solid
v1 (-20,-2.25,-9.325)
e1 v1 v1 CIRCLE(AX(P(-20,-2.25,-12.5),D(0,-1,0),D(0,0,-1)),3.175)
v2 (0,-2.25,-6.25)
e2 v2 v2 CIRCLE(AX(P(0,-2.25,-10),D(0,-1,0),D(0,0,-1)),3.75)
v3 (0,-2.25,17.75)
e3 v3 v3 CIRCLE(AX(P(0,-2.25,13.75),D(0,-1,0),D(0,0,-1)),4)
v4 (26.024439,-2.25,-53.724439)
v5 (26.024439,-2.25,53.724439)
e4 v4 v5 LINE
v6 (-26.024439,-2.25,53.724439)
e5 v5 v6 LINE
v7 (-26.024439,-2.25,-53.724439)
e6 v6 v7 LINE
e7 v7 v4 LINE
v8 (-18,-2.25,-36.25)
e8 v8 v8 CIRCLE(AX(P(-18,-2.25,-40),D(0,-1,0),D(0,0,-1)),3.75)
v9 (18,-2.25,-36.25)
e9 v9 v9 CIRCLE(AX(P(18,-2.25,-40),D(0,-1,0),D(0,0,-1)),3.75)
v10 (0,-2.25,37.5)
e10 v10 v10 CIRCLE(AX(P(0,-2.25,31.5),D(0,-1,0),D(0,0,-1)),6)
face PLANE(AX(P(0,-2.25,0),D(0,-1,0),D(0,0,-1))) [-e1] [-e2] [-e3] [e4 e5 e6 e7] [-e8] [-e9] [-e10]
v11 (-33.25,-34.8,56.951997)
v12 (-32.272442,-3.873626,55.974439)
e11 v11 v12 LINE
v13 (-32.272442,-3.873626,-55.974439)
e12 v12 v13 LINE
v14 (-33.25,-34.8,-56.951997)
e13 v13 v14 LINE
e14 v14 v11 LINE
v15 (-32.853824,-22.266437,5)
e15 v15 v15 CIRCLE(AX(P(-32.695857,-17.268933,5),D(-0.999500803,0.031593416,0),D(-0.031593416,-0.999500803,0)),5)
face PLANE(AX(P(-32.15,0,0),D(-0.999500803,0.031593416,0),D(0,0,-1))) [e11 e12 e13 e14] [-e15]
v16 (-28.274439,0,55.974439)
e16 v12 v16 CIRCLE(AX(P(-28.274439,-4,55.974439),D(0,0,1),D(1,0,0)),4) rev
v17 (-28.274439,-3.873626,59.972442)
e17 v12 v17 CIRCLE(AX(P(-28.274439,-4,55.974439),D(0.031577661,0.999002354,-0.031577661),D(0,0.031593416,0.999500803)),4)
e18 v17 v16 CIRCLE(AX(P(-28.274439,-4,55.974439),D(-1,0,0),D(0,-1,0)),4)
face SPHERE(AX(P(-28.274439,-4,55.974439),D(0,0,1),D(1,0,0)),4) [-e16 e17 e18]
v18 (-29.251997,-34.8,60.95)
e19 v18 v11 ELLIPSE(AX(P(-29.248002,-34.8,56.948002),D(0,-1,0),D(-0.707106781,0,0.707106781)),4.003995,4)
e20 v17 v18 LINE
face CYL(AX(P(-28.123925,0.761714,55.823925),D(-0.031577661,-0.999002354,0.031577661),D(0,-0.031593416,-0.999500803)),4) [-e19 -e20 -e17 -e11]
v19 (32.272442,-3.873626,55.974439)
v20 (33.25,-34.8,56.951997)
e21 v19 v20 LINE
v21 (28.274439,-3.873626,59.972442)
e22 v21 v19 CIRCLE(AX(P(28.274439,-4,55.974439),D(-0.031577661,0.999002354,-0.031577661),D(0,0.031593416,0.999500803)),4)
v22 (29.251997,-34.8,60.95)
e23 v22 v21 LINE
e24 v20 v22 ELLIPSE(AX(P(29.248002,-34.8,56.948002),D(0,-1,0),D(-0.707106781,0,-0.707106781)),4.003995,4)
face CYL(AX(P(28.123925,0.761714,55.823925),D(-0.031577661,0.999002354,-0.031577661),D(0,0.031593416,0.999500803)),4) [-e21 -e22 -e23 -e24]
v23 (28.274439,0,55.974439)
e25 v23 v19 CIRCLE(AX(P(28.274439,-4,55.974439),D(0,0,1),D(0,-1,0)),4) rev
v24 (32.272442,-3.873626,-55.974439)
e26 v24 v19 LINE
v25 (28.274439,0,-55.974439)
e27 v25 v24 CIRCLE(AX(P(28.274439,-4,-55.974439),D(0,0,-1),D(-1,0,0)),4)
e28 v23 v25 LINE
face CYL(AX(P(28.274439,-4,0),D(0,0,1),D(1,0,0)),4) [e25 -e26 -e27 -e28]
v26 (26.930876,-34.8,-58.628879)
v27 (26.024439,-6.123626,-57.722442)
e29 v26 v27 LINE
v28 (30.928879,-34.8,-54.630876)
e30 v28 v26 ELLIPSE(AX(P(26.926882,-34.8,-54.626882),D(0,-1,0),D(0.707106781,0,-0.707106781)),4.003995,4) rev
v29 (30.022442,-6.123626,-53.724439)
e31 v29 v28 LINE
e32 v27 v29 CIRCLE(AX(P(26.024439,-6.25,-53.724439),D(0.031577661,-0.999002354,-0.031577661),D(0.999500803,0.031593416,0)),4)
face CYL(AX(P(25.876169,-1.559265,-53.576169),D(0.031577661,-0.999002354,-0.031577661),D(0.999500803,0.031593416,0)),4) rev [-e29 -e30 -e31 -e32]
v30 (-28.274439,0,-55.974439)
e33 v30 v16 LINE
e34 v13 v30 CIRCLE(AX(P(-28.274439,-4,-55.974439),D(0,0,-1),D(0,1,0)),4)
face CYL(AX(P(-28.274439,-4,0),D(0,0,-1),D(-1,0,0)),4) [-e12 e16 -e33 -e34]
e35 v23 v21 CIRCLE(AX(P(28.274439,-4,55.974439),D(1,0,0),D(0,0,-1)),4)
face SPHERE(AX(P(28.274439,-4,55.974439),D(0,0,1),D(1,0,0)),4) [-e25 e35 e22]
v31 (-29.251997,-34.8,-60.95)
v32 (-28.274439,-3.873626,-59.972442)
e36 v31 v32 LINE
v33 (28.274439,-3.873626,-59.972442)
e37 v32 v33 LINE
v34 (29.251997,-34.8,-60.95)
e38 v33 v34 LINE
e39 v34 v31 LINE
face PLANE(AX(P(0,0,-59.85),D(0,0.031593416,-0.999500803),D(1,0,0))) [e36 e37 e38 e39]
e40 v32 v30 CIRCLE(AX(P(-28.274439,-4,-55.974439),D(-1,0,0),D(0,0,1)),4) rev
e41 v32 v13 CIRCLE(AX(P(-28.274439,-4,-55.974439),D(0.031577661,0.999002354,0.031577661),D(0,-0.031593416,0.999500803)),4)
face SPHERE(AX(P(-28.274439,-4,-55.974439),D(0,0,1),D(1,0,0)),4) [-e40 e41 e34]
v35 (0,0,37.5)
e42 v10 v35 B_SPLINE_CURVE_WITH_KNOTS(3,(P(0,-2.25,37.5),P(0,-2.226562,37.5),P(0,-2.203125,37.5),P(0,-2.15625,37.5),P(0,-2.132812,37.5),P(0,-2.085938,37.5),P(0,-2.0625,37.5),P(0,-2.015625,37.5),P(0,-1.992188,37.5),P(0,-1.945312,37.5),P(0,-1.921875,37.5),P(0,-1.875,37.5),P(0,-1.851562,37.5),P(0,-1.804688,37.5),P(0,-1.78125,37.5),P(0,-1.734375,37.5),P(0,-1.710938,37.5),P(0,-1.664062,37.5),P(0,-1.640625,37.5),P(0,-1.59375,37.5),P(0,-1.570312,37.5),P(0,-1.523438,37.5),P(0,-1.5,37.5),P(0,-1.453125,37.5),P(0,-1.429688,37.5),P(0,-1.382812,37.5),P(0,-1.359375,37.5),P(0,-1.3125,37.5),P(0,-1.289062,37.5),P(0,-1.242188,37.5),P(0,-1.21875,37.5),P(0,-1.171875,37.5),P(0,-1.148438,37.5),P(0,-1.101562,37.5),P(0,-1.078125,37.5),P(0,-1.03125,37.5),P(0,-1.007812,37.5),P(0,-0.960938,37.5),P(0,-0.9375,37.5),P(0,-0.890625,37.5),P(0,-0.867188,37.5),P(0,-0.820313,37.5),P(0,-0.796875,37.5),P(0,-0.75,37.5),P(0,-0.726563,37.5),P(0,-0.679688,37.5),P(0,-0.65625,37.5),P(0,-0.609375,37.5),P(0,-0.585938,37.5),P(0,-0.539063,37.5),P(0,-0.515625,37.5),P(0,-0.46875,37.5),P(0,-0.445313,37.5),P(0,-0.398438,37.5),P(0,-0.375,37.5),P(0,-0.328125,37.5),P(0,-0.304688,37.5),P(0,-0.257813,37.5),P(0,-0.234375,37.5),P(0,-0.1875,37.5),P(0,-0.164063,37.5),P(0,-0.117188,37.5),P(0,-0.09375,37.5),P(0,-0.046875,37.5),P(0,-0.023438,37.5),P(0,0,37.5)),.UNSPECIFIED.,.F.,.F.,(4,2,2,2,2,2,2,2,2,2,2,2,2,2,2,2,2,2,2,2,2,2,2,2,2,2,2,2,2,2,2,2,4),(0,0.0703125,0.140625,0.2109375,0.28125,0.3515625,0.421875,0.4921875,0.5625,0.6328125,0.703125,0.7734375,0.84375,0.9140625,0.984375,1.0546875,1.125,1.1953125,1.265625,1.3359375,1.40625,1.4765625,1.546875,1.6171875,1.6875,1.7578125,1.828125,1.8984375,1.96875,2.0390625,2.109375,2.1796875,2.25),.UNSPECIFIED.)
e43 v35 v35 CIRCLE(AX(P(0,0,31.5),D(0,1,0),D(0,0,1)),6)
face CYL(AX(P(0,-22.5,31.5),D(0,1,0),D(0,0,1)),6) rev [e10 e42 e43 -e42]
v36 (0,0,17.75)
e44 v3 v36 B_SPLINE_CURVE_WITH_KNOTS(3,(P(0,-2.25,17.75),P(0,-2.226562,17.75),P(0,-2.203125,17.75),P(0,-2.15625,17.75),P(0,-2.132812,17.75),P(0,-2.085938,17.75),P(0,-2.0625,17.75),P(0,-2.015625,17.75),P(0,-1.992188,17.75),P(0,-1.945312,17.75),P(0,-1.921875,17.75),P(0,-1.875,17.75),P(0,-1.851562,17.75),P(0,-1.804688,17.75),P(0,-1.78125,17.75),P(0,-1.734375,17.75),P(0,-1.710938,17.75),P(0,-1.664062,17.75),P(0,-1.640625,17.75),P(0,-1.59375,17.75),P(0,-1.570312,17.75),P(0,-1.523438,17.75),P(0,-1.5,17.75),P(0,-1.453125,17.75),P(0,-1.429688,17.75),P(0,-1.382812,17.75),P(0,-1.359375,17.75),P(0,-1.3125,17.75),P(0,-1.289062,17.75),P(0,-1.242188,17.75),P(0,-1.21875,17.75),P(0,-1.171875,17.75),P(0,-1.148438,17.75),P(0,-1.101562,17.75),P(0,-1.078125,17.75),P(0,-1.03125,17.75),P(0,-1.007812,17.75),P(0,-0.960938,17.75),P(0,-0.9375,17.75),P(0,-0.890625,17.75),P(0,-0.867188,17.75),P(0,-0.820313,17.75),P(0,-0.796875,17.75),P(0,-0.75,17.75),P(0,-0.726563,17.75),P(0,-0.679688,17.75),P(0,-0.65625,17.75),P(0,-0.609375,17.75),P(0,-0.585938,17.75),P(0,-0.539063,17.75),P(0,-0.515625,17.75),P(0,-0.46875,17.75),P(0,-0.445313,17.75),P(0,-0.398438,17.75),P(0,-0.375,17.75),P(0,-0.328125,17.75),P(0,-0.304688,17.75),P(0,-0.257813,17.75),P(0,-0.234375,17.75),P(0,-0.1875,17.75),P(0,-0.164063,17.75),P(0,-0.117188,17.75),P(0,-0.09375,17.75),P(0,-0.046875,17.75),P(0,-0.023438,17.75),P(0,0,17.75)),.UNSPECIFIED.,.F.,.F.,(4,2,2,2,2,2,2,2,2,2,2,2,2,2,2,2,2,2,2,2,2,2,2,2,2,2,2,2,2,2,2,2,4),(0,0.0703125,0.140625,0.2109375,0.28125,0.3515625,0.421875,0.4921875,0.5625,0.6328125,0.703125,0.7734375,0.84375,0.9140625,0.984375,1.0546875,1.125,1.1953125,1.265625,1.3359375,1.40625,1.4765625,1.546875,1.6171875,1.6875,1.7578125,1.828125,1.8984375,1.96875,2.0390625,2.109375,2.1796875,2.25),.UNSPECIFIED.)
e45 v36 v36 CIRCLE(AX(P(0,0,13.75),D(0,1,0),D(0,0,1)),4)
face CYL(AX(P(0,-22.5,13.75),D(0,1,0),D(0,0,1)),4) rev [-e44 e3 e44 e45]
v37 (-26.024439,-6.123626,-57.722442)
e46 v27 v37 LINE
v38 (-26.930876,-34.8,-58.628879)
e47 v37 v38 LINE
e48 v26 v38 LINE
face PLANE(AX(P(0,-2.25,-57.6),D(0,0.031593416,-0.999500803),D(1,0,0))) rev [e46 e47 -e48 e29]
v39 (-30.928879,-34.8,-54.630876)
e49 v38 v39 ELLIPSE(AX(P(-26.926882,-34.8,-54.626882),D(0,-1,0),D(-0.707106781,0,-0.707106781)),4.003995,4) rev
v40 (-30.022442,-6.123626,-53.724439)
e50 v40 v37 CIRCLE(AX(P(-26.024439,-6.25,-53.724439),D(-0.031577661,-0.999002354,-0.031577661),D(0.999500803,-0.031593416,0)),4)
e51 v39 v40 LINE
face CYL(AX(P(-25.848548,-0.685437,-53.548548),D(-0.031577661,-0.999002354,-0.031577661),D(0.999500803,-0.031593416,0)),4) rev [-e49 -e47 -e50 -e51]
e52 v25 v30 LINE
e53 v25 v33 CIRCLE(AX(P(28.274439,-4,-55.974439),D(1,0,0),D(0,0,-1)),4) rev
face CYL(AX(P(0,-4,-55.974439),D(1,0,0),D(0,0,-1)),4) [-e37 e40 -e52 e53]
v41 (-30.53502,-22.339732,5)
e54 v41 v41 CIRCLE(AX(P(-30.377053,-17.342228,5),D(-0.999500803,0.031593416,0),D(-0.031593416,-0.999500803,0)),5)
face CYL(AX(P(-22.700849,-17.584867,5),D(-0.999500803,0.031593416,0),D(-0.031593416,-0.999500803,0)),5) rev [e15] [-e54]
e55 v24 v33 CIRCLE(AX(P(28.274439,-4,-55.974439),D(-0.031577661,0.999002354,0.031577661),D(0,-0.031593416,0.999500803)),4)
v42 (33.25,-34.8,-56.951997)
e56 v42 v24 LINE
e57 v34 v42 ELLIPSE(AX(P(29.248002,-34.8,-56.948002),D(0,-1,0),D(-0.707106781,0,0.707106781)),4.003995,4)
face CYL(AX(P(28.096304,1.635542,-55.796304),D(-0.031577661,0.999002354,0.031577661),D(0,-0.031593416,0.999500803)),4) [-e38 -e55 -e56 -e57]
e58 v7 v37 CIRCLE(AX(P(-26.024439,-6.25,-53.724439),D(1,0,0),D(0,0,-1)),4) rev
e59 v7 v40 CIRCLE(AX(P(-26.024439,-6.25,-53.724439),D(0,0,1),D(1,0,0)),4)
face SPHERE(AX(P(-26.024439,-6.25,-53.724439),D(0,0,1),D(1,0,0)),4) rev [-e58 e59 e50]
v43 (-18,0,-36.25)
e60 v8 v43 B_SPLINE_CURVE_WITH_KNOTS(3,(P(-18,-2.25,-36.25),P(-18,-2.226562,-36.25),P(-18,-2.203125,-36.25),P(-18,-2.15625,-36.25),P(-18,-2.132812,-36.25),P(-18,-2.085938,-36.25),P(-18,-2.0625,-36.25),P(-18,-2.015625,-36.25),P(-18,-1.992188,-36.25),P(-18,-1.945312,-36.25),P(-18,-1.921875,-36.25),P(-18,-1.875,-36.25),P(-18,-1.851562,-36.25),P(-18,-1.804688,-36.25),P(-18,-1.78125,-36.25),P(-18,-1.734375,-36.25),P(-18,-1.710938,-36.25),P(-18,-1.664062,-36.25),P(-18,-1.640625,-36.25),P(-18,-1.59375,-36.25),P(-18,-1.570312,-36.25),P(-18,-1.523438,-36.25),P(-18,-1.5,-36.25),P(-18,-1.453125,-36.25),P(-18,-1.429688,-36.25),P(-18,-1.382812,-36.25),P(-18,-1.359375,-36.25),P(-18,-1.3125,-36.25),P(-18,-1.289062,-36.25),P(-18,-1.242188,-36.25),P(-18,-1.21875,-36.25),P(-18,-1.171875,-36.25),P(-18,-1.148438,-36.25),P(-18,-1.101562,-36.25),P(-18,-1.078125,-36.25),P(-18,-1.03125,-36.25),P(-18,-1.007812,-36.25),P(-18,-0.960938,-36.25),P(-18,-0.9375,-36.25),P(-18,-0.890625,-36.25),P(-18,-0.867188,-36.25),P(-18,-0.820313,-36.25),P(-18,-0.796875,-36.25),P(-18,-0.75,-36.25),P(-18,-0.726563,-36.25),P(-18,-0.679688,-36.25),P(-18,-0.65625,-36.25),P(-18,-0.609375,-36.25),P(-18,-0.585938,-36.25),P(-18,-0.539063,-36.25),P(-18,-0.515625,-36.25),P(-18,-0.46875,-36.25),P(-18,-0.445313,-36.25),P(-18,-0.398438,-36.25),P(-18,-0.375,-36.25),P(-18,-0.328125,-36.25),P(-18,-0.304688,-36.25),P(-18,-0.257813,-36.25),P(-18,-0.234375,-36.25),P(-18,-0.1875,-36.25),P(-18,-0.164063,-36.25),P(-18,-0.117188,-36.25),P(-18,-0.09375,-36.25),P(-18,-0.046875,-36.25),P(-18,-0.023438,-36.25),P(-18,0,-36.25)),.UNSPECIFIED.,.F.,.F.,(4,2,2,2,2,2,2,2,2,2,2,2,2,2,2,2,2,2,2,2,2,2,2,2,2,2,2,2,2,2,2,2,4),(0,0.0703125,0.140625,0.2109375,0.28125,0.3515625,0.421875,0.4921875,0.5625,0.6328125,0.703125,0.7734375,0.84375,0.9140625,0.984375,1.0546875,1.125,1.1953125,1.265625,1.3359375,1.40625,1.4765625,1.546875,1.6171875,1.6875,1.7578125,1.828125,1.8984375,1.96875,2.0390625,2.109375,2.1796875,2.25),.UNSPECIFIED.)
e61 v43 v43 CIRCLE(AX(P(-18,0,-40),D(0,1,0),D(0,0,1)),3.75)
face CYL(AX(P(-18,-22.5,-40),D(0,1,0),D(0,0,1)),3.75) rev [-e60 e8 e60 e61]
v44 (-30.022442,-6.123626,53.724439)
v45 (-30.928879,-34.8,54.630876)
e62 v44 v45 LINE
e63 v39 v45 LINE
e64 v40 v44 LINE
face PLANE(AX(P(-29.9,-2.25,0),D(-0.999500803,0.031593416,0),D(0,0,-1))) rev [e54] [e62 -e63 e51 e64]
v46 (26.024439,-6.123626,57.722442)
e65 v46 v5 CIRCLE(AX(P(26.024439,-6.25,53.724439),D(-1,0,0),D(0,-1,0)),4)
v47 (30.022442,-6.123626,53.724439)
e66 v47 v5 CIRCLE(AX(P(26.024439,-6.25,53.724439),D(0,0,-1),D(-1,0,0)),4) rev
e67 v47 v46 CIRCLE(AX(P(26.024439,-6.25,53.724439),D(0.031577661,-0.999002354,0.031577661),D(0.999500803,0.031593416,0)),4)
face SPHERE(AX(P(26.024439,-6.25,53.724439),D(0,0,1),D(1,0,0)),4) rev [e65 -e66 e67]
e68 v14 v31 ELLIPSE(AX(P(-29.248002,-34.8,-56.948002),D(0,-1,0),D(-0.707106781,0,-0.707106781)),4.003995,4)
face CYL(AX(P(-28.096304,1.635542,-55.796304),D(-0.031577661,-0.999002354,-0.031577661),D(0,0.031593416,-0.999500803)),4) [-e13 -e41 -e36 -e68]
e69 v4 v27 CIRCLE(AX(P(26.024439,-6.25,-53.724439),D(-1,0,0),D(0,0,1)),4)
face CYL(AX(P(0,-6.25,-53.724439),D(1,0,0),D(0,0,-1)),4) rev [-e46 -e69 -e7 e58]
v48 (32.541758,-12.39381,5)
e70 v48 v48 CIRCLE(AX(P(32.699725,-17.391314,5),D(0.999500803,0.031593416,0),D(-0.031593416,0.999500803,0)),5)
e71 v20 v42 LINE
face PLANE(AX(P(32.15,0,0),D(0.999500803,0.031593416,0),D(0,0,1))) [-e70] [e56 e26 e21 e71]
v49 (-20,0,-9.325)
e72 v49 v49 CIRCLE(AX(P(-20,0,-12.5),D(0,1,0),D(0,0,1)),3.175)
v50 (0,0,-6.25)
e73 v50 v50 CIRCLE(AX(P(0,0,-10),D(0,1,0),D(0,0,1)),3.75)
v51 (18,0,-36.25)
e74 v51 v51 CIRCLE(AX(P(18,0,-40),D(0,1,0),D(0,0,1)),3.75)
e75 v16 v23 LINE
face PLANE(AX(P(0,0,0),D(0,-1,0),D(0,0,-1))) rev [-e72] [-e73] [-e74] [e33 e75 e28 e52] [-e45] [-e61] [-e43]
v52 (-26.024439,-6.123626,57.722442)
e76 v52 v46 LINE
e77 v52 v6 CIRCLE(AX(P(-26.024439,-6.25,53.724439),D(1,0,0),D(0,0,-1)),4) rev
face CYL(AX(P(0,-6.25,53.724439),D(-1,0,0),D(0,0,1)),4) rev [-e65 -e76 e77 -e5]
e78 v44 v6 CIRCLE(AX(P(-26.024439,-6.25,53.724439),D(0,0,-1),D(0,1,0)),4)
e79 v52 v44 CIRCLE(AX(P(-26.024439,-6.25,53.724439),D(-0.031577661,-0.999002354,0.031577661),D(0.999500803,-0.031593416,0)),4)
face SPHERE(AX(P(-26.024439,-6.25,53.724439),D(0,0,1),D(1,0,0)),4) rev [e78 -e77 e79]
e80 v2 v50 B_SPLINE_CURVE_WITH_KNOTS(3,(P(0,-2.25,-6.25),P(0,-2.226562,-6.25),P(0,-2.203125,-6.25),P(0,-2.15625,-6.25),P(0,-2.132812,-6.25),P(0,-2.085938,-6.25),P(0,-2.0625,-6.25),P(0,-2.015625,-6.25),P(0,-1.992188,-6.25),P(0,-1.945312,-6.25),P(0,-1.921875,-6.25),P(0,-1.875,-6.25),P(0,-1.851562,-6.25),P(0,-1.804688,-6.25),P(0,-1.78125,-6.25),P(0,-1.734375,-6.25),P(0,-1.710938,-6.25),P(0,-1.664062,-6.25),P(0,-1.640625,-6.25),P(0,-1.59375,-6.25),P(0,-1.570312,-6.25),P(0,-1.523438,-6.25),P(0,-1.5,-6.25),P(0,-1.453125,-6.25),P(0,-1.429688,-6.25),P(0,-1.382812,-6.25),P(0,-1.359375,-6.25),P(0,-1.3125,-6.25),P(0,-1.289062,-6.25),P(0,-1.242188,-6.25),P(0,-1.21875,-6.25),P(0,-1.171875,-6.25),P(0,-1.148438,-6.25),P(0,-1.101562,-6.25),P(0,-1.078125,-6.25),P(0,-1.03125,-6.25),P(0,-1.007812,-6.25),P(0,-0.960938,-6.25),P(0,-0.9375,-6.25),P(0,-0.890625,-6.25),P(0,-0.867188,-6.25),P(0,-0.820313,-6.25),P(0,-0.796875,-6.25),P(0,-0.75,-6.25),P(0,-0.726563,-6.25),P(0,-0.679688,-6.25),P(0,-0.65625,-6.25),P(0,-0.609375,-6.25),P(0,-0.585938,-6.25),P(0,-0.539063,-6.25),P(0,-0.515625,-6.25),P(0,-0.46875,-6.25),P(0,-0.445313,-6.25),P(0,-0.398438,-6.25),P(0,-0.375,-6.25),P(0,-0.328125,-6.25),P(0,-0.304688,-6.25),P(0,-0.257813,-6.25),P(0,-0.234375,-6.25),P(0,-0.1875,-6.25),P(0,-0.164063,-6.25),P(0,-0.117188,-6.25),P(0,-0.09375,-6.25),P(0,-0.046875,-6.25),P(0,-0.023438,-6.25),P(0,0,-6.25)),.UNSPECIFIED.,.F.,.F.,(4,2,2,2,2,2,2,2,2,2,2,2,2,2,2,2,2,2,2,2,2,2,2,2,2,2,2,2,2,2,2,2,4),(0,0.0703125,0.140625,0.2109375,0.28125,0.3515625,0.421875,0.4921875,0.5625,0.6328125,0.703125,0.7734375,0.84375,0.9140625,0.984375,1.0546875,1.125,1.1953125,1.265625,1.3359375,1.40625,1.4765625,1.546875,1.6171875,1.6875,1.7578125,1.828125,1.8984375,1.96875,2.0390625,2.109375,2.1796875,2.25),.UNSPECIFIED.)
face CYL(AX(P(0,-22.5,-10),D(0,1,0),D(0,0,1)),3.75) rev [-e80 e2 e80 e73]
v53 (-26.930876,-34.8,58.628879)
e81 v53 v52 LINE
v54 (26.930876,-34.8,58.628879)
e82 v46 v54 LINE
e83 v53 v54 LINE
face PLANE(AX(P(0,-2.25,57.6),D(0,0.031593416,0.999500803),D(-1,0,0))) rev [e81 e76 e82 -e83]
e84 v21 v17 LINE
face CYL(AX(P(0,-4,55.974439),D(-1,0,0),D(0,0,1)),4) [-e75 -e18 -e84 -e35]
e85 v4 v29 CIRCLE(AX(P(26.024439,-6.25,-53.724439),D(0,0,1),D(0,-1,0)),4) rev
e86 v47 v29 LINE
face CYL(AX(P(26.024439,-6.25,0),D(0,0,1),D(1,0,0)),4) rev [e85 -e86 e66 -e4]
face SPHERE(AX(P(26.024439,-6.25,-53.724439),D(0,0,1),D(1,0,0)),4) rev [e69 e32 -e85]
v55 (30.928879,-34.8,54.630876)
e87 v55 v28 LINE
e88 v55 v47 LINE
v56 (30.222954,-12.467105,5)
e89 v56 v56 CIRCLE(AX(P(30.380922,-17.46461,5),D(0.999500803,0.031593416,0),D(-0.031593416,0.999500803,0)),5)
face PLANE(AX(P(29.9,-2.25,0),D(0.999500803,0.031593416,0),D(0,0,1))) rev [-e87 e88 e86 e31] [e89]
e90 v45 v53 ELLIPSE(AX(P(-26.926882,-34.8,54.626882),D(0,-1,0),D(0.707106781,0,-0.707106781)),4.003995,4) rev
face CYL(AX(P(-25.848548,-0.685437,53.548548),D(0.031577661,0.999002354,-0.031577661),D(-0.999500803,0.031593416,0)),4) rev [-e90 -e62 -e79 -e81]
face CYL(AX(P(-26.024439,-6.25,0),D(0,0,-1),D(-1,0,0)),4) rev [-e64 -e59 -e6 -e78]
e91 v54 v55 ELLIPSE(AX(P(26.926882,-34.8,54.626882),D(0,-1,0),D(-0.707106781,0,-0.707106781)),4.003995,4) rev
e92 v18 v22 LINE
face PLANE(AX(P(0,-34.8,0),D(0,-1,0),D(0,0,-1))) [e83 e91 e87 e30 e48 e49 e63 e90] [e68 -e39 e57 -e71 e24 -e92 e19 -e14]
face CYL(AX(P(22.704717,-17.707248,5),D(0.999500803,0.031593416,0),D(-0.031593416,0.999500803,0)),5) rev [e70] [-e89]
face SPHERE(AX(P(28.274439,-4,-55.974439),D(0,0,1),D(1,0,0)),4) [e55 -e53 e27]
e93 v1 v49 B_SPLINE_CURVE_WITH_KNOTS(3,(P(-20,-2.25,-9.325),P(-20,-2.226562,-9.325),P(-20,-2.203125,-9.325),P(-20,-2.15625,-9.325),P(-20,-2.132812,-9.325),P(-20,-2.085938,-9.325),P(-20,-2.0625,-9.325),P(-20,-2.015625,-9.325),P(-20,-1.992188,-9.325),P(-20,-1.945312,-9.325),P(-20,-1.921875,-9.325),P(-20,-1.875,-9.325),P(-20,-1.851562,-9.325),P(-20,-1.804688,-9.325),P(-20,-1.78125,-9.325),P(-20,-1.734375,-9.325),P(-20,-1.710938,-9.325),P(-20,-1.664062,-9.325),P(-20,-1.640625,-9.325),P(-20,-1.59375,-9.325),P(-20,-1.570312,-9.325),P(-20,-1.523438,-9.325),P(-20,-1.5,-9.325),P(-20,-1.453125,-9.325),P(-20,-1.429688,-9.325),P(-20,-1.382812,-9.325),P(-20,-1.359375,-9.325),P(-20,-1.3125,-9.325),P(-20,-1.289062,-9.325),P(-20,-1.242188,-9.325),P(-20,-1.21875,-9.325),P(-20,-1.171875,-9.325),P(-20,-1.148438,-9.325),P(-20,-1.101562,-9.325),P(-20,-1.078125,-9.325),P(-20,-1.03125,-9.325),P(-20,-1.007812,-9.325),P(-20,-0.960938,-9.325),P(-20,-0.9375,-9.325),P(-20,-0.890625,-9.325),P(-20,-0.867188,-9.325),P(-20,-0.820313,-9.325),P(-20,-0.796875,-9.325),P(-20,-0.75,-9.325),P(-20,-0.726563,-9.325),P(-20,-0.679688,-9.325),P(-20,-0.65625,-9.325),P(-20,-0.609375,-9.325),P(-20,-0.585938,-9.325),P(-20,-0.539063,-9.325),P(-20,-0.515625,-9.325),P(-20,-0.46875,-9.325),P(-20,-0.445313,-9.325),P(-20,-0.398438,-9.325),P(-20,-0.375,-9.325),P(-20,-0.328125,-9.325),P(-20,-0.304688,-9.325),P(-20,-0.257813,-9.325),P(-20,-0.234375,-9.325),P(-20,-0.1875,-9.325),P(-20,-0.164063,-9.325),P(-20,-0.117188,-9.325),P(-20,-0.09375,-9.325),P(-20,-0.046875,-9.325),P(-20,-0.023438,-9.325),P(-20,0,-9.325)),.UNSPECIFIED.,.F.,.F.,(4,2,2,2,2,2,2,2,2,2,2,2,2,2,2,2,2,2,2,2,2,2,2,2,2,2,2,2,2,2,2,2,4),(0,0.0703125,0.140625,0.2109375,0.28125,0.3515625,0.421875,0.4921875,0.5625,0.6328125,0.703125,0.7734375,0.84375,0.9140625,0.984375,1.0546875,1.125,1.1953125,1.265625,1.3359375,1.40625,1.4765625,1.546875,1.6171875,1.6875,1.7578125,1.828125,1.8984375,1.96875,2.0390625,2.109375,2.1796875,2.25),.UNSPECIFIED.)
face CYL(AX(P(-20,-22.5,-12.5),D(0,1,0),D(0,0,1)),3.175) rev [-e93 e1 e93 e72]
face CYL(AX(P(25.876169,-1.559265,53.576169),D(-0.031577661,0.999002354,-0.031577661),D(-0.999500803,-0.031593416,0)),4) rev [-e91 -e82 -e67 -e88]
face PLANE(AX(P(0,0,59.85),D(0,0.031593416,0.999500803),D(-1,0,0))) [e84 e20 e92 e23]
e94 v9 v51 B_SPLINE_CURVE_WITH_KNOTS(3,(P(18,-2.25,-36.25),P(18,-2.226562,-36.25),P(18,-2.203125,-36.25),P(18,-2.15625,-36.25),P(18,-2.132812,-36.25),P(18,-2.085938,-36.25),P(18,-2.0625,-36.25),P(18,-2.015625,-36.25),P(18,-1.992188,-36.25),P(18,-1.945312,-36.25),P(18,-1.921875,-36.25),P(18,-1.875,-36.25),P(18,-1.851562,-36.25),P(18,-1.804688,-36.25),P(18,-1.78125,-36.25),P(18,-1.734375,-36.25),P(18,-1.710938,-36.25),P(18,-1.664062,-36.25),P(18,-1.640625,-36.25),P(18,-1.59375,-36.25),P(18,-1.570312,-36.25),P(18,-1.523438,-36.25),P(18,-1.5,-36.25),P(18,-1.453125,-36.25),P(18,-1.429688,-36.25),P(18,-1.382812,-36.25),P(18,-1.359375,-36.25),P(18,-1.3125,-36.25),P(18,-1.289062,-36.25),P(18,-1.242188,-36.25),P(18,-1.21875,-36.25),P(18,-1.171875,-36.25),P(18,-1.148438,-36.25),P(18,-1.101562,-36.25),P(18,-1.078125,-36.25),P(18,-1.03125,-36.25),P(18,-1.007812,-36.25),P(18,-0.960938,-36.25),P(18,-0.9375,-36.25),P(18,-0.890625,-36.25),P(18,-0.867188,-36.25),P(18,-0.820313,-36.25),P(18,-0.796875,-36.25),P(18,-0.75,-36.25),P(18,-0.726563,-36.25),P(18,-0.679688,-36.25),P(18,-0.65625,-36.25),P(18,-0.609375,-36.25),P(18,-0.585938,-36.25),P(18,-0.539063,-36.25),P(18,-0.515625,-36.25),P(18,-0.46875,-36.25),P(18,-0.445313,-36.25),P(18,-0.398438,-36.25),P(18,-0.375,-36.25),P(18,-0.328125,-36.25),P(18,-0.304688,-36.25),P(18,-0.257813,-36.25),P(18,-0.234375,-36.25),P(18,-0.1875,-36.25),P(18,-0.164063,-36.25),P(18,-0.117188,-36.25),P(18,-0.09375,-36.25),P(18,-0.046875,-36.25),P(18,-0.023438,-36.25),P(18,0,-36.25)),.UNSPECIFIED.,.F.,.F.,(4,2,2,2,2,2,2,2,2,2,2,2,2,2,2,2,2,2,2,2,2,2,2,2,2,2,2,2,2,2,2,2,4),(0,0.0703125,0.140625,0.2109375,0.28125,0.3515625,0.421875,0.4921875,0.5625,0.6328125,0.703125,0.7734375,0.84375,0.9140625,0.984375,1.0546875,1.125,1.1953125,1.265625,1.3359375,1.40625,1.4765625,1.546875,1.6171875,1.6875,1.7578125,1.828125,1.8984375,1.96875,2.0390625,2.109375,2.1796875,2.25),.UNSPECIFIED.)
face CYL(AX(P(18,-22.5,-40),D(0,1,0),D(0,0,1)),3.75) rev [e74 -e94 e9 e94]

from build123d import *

# Parameters (mm, degrees)
SKETCH1_W              = 66.5
SKETCH1_H              = 121.9
BOX_DEPTH              = 34.8
SKETCH4_W              = 62
SKETCH4_H              = 117.4
HOLLOW_DEPTH           = 32.55
SIDE_WALL_DRAFT_SIZE   = 34.8
SIDE_WALL_DRAFT_SIZE_2 = 1.1
CORNER_ROUNDING_R      = 4
SKETCH2_R              = 3.75
SKETCH2_R_2            = 4
SKETCH2_R_3            = 6
SKETCH2_R_4            = 3.175
TOP_SIDE_CUT_DEPTH     = 22.5
SKETCH6_R              = 5
INPUT_JACK_DEPTH       = 10
SKETCH7_R              = 5
OUTPUT_JACK_DEPTH      = 10


with BuildPart() as part:
    # Sketch1 → Box (new body)
    with BuildSketch(Plane(origin=(0, 0, 0), x_dir=(1, 0, 0), z_dir=(0, 1, 0))):
        Rectangle(SKETCH1_W, SKETCH1_H)
    extrude(amount=-BOX_DEPTH)

    # Sketch4 → Hollow (cut)
    with BuildSketch(Plane.XZ.offset(34.8)):
        Rectangle(SKETCH4_W, SKETCH4_H)
    extrude(amount=-HOLLOW_DEPTH, mode=Mode.SUBTRACT)

    # Side wall draft
    # the kernel refuses this chamfer: 34.8, 1.1 mm, written as the material it adds along each edge
    with BuildSketch(Plane(origin=(-31, -2.25, 58.7), x_dir=(-0.001215153825981483, -0.999999261700317, 0), z_dir=(0, 0, -1))) as side_wall_draft_piece_1_section:
        Polygon((SIDE_WALL_DRAFT_SIZE * 0.9999992617, -SIDE_WALL_DRAFT_SIZE * 0.00121515382598), (-SIDE_WALL_DRAFT_SIZE_2 * 0.00121515382598, -SIDE_WALL_DRAFT_SIZE_2 * 0.9999992617), (0, 0), align=None)
    side_wall_draft_piece_1 = extrude(amount=117.4, mode=Mode.PRIVATE)
    side_wall_draft_piece_1 = split(side_wall_draft_piece_1, bisect_by=Plane(origin=(-30.631893643, -34.8, 0), z_dir=(0, 1, 0)), keep=Keep.TOP, mode=Mode.PRIVATE)
    add(side_wall_draft_piece_1)
    with BuildSketch(Plane(origin=(31, -2.25, 58.7), x_dir=(0, -0.999999261700317, 0.0012151538259815812), z_dir=(-1, 0, 0))) as side_wall_draft_piece_2_section:
        Polygon((SIDE_WALL_DRAFT_SIZE * 0.9999992617, -SIDE_WALL_DRAFT_SIZE * 0.00121515382598), (-SIDE_WALL_DRAFT_SIZE_2 * 0.00121515382598, -SIDE_WALL_DRAFT_SIZE_2 * 0.9999992617), (0, 0), align=None)
    side_wall_draft_piece_2 = extrude(amount=62, mode=Mode.PRIVATE)
    side_wall_draft_piece_2 = split(side_wall_draft_piece_2, bisect_by=Plane(origin=(0, -34.8, 58.331893643), z_dir=(0, 1, 0)), keep=Keep.TOP, mode=Mode.PRIVATE)
    add(side_wall_draft_piece_2)
    with BuildSketch(Plane(origin=(31, -2.25, -58.7), x_dir=(0.001215153825981483, -0.999999261700317, 0), z_dir=(0, 0, 1))) as side_wall_draft_piece_3_section:
        Polygon((SIDE_WALL_DRAFT_SIZE * 0.9999992617, -SIDE_WALL_DRAFT_SIZE * 0.00121515382598), (-SIDE_WALL_DRAFT_SIZE_2 * 0.00121515382598, -SIDE_WALL_DRAFT_SIZE_2 * 0.9999992617), (0, 0), align=None)
    side_wall_draft_piece_3 = extrude(amount=117.4, mode=Mode.PRIVATE)
    side_wall_draft_piece_3 = split(side_wall_draft_piece_3, bisect_by=Plane(origin=(30.631893643, -34.8, 0), z_dir=(0, 1, 0)), keep=Keep.TOP, mode=Mode.PRIVATE)
    add(side_wall_draft_piece_3)
    with BuildSketch(Plane(origin=(-31, -2.25, -58.7), x_dir=(0, -0.999999261700317, -0.0012151538259815812), z_dir=(1, 0, 0))) as side_wall_draft_piece_4_section:
        Polygon((SIDE_WALL_DRAFT_SIZE * 0.9999992617, -SIDE_WALL_DRAFT_SIZE * 0.00121515382598), (-SIDE_WALL_DRAFT_SIZE_2 * 0.00121515382598, -SIDE_WALL_DRAFT_SIZE_2 * 0.9999992617), (0, 0), align=None)
    side_wall_draft_piece_4 = extrude(amount=62, mode=Mode.PRIVATE)
    side_wall_draft_piece_4 = split(side_wall_draft_piece_4, bisect_by=Plane(origin=(0, -34.8, -58.331893643), z_dir=(0, 1, 0)), keep=Keep.TOP, mode=Mode.PRIVATE)
    add(side_wall_draft_piece_4)
    # the kernel refuses this chamfer: 34.8, 1.1 mm, written as the material it takes off along each edge
    with BuildSketch(Plane(origin=(-123.728329596, 0, 60.95), x_dir=(0, -0.999999261700317, 0.0012151538259815812), z_dir=(1, 0, 0))) as side_wall_draft_2_piece_1:
        Polygon((SIDE_WALL_DRAFT_SIZE * 0.9999992617, SIDE_WALL_DRAFT_SIZE * 0.00121515382598), (-SIDE_WALL_DRAFT_SIZE_2 * 0.00121515382598, SIDE_WALL_DRAFT_SIZE_2 * 0.9999992617), (0, 0), align=None)
    extrude(amount=247.456659192, mode=Mode.SUBTRACT)
    with BuildSketch(Plane(origin=(-33.25, 0, -151.428329596), x_dir=(-0.0012151538259815812, -0.999999261700317, 0), z_dir=(0, 0, 1)), Plane(origin=(33.25, 0, 151.428329596), x_dir=(0.0012151538259815812, -0.999999261700317, 0), z_dir=(0, 0, -1))) as side_wall_draft_2_piece_2:
        Polygon((SIDE_WALL_DRAFT_SIZE * 0.9999992617, SIDE_WALL_DRAFT_SIZE * 0.00121515382598), (-SIDE_WALL_DRAFT_SIZE_2 * 0.00121515382598, SIDE_WALL_DRAFT_SIZE_2 * 0.9999992617), (0, 0), align=None)
    extrude(amount=302.856659192, mode=Mode.SUBTRACT)
    with BuildSketch(Plane(origin=(123.728329596, 0, -60.95), x_dir=(0, 0.7724211149227607, 0.6351107157192984), z_dir=(-1, 0, 0))) as side_wall_draft_2_piece_3:
        Polygon((SIDE_WALL_DRAFT_SIZE_2 * 0.635110715719, -SIDE_WALL_DRAFT_SIZE_2 * 0.772421114923), (-SIDE_WALL_DRAFT_SIZE * 0.772421114923, -SIDE_WALL_DRAFT_SIZE * 0.635110715719), (0, 0), align=None)
    extrude(amount=247.456659192, mode=Mode.SUBTRACT)

    # Corner rounding
    corner_rounding_edges = [part.edges().sort_by_distance(p)[0] for p in [
        (0, -2.25, -57.6),
        (29.9, -2.25, 0),
        (0, -2.25, 57.6),
        (-29.9, -2.25, 0),
        (32.15, 0, 0),
        (0, 0, -59.85),
        (-32.15, 0, 0),
        (0, 0, 59.85),
        (30.414439655, -18.525, 58.114439655),
        (30.414439655, -18.525, -58.114439655),
        (-30.414439655, -18.525, 58.114439655),
        (-30.414439655, -18.525, -58.114439655),
        (-32.7, -17.4, -60.4),
        (32.7, -17.4, -60.4),
        (-32.7, -17.4, 60.4),
        (32.7, -17.4, 60.4),
    ]]
    fillet(corner_rounding_edges, radius=CORNER_ROUNDING_R)

    # Sketch2 → Top side cut (cut)
    with BuildSketch(Plane(origin=(0, 0, 0), x_dir=(1, 0, 0), z_dir=(0, 1, 0))):
        with Locations(Location((-18, 40, 0), (0, 0, 270))):
            Circle(SKETCH2_R)
        with Locations(Location((0, -13.75, 0), (0, 0, 270))):
            Circle(SKETCH2_R_2)
        with Locations(Location((0, -31.5, 0), (0, 0, 270))):
            Circle(SKETCH2_R_3)
        with Locations(Location((-20, 12.5, 0), (0, 0, 270))):
            Circle(SKETCH2_R_4)
        with Locations(Location((18, 40, 0), (0, 0, 270))):
            Circle(SKETCH2_R)
        with Locations(Location((0, 10, 0), (0, 0, 270))):
            Circle(SKETCH2_R)
    extrude(amount=-TOP_SIDE_CUT_DEPTH, mode=Mode.SUBTRACT)

    # Sketch6 → Input Jack (cut)
    with BuildSketch(Plane(origin=(32.117909672, 1.015221283, 0), x_dir=(0, 0, -1), z_dir=(0.9995008034277885, 0.03159341620030004, 0))):
        with Locations(Location((-5, -18.415728331, 0), (0, 0, 90))):
            Circle(SKETCH6_R)
    extrude(amount=-INPUT_JACK_DEPTH, mode=Mode.SUBTRACT)

    # Sketch7 → Output Jack (cut)
    with BuildSketch(Plane(origin=(-32.117909672, 1.015221283, 0), x_dir=(0, 0, 1), z_dir=(-0.9995008034277885, 0.03159341620030004, 0))):
        with Locations(Location((5, -18.293286119, 0), (0, 0, 270))):
            Circle(SKETCH7_R)
    extrude(amount=-OUTPUT_JACK_DEPTH, mode=Mode.SUBTRACT)


solid = part.part
